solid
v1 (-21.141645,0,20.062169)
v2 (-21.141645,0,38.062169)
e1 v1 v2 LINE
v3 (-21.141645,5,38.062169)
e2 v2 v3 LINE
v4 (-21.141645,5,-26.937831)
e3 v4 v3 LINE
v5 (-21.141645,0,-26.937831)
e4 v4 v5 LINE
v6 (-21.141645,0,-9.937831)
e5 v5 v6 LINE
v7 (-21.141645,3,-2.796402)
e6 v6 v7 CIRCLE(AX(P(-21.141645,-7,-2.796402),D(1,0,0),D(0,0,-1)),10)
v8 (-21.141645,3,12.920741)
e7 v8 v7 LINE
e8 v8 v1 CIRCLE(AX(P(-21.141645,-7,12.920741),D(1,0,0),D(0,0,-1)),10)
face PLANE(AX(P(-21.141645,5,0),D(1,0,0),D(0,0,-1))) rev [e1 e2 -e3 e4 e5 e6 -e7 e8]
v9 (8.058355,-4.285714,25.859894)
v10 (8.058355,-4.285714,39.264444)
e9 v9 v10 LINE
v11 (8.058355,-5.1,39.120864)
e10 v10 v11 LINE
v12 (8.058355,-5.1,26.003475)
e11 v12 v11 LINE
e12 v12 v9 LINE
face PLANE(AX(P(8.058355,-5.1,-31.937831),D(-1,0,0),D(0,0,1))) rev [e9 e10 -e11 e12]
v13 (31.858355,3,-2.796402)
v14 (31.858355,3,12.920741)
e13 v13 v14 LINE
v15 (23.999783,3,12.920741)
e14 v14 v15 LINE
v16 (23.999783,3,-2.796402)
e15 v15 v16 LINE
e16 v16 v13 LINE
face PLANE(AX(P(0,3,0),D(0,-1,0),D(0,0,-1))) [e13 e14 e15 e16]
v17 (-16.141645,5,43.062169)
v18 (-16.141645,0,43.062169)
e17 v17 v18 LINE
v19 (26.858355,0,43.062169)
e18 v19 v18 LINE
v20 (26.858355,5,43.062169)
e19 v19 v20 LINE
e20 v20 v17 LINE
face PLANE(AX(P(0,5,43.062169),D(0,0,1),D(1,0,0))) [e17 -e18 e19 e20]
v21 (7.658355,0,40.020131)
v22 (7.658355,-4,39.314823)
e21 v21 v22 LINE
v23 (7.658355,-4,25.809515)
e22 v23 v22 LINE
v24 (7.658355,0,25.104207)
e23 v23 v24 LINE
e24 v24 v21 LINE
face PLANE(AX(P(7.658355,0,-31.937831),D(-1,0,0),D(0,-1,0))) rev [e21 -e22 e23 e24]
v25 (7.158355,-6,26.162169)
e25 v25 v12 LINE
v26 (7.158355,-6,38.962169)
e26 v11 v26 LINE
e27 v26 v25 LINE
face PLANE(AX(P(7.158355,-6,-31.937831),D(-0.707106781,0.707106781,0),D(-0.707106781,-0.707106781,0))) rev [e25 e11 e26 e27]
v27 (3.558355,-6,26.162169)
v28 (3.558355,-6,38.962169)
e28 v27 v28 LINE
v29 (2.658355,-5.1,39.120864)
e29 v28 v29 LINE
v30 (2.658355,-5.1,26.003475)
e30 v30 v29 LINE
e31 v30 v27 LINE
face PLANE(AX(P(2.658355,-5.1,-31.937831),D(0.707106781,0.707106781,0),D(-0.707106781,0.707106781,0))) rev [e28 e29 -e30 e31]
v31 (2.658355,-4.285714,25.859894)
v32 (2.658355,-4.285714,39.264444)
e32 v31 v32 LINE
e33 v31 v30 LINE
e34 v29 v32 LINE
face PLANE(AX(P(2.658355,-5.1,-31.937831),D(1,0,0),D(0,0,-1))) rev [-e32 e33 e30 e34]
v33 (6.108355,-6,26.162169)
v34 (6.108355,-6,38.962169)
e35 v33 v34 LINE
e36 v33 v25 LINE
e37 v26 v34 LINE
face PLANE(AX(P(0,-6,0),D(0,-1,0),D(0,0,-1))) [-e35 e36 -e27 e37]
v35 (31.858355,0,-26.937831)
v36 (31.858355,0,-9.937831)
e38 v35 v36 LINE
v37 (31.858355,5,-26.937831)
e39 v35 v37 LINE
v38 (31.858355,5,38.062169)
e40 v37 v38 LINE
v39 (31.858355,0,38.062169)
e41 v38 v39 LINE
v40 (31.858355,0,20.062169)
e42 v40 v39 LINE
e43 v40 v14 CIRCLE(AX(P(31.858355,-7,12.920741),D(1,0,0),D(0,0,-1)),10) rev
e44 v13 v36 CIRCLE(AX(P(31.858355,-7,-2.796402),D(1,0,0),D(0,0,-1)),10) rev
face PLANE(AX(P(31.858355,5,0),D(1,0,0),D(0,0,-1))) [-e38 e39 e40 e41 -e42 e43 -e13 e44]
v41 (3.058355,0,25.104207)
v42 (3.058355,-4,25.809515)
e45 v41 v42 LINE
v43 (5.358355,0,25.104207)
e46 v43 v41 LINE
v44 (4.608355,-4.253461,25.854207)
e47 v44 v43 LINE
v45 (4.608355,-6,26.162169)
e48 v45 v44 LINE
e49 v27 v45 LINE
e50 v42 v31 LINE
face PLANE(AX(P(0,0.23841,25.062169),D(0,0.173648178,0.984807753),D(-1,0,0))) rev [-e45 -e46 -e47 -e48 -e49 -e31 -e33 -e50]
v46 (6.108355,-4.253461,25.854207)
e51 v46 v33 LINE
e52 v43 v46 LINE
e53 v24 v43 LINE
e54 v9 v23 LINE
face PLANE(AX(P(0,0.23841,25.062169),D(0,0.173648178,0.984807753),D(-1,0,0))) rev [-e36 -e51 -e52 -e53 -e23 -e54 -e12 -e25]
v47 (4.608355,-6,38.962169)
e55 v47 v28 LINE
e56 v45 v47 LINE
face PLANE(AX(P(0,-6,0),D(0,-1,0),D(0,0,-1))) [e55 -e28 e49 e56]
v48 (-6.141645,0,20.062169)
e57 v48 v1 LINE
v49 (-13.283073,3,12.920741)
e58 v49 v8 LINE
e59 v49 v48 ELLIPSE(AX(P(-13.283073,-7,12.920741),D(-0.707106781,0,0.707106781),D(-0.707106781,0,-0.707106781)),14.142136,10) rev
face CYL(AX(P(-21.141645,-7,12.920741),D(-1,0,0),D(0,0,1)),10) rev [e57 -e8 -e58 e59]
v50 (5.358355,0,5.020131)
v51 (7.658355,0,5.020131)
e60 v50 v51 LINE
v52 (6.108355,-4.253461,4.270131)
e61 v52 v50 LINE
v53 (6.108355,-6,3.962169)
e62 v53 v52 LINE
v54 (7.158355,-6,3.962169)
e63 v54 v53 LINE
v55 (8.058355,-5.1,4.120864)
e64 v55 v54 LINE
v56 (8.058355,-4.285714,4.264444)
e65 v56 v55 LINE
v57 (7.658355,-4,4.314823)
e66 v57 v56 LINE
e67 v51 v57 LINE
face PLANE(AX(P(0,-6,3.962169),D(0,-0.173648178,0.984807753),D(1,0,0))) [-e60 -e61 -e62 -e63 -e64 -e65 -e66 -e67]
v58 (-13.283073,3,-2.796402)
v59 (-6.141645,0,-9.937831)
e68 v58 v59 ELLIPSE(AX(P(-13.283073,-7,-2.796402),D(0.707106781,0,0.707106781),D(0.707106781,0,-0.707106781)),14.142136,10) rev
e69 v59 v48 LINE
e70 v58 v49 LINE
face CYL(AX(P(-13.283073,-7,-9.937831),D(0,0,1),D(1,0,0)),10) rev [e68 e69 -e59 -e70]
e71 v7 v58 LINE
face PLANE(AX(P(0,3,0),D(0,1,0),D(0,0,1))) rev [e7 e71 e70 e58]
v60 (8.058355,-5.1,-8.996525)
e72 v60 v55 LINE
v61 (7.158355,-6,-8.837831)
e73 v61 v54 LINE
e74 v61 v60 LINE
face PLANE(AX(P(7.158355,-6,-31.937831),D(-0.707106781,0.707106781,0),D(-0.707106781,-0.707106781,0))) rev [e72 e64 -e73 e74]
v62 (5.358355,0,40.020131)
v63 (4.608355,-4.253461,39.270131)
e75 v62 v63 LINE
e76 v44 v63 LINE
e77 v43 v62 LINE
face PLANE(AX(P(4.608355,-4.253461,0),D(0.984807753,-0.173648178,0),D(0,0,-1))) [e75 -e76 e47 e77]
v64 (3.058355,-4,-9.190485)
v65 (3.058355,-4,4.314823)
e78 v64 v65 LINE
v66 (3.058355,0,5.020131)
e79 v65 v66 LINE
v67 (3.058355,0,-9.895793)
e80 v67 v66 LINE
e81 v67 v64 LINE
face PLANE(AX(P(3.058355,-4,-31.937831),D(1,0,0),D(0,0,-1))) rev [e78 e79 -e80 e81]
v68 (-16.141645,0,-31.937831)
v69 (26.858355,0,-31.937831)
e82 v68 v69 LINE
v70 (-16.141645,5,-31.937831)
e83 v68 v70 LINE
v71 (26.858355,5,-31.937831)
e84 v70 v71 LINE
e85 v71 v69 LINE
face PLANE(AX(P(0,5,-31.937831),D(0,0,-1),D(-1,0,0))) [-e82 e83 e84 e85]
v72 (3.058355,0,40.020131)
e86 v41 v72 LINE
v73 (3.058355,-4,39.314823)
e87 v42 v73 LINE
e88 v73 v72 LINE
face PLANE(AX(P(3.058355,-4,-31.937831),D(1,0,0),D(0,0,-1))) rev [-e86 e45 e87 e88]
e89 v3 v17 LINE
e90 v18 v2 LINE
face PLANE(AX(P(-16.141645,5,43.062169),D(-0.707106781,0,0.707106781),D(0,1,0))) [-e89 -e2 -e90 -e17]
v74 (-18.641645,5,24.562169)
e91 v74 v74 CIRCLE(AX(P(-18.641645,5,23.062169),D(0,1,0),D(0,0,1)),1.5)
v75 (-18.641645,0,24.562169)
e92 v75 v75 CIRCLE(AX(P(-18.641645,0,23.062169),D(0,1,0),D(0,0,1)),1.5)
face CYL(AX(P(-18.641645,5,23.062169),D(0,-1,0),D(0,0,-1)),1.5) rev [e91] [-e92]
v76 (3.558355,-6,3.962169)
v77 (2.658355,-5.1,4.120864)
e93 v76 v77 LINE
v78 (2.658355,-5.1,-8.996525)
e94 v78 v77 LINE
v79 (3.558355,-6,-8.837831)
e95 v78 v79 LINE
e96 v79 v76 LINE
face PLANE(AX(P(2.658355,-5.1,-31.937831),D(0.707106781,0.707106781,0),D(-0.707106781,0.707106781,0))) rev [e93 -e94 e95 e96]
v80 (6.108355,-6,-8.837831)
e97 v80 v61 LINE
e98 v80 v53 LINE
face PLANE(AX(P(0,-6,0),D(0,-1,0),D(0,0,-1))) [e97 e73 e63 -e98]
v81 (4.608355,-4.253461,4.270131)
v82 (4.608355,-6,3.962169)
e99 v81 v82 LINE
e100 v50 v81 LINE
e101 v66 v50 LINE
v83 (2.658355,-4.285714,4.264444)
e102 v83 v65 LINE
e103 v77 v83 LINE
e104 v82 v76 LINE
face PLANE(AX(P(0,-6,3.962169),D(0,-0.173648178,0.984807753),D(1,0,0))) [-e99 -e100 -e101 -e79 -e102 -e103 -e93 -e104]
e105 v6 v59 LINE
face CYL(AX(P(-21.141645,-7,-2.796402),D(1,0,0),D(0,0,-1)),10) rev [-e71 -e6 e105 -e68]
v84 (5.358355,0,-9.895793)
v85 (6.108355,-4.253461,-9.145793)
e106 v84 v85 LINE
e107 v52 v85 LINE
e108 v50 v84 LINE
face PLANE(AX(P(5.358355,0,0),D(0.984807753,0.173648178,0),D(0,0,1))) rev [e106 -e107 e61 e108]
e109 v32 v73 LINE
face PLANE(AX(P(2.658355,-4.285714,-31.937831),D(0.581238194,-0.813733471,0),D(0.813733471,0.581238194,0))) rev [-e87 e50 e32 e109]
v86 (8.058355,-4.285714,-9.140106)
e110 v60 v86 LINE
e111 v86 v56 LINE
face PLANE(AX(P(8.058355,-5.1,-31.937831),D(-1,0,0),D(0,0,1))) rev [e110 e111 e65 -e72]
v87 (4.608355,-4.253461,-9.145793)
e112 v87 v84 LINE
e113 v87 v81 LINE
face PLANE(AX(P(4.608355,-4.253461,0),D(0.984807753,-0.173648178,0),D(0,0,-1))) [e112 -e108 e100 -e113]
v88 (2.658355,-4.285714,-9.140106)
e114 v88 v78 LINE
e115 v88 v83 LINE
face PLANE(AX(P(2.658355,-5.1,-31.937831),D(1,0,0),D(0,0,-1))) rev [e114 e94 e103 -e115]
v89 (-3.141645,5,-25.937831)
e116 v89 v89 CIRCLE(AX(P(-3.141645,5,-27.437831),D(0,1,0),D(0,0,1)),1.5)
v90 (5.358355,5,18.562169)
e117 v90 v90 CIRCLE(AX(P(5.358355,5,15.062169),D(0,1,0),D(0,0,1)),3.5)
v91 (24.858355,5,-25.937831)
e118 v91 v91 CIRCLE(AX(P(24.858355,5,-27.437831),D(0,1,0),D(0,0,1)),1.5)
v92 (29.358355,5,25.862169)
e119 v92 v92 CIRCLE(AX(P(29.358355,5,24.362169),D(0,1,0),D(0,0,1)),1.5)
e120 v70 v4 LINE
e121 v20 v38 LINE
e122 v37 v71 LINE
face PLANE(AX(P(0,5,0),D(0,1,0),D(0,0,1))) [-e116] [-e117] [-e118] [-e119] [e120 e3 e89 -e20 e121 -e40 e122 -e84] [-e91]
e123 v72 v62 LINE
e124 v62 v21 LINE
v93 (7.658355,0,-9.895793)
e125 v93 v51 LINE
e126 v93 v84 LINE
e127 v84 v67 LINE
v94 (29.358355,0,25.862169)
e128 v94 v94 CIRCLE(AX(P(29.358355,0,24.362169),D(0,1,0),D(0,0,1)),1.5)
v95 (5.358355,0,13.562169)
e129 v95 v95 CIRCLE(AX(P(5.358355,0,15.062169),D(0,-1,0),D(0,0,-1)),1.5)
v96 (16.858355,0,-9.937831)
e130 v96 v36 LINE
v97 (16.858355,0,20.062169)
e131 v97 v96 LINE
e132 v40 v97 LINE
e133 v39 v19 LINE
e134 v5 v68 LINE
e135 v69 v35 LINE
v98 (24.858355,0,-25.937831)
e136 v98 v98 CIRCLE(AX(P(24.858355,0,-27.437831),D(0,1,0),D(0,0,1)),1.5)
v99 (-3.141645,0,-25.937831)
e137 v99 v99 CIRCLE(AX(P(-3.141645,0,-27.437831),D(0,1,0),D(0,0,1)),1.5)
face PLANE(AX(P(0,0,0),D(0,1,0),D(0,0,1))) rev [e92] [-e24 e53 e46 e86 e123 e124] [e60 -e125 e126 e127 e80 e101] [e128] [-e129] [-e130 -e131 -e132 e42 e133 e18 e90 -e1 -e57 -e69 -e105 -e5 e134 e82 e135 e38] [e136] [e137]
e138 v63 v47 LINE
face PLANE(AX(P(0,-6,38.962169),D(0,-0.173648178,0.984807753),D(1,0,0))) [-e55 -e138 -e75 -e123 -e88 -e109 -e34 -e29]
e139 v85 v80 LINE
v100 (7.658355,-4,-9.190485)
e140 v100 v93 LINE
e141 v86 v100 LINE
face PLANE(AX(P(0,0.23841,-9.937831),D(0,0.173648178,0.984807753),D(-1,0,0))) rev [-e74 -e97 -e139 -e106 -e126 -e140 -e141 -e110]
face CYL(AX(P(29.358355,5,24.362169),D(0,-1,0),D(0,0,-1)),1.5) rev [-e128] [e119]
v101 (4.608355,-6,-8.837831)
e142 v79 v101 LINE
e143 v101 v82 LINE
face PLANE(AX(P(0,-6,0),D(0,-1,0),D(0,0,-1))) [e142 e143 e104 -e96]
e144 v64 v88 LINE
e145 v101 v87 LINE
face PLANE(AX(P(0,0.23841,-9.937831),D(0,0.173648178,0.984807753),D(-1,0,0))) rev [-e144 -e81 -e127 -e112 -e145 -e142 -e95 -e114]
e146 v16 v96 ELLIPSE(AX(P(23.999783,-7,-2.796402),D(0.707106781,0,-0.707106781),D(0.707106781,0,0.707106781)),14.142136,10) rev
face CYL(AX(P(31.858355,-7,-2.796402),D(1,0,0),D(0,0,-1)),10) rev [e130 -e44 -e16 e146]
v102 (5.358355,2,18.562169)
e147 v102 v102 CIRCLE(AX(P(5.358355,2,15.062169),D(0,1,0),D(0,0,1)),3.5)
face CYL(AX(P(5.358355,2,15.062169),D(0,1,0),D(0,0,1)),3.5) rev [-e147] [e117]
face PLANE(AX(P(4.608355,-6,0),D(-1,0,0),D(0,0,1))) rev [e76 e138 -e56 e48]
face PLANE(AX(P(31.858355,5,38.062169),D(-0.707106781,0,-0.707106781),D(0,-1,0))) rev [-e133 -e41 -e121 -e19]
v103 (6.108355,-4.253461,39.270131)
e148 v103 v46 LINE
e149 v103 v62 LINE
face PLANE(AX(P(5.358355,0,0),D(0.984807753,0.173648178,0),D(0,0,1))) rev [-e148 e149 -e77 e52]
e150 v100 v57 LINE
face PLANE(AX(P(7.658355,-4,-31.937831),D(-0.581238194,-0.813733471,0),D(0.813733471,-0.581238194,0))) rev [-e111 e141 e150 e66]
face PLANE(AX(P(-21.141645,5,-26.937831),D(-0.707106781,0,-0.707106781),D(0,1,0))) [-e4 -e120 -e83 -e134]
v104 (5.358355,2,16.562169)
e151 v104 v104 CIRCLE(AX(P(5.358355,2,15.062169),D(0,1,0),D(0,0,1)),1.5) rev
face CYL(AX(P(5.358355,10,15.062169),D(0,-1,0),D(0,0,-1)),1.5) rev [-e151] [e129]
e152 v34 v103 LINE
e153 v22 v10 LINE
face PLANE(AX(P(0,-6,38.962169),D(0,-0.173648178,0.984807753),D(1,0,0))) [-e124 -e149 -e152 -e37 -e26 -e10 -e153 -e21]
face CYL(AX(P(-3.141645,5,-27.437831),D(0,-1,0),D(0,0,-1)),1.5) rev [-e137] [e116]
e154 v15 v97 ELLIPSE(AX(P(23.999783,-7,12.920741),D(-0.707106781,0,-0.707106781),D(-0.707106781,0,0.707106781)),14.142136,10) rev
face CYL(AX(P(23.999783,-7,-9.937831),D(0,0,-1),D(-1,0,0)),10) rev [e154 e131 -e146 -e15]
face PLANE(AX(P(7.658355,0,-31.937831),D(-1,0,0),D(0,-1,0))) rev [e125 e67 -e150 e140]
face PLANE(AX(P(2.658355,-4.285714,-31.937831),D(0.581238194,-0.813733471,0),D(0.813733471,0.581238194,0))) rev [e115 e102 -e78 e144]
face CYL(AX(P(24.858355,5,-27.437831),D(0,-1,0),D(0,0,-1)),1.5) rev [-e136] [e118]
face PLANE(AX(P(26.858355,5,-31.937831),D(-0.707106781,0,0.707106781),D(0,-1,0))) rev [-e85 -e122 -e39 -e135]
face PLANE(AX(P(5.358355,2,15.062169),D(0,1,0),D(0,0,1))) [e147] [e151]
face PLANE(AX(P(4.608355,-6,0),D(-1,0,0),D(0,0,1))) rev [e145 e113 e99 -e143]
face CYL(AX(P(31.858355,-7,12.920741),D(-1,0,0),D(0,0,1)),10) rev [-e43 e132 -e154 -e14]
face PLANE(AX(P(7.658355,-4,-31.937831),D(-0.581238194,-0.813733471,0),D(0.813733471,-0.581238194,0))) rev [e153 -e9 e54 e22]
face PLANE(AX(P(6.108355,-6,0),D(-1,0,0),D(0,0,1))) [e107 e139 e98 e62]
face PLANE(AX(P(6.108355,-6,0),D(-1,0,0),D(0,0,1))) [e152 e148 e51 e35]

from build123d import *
from OCP.BRepFilletAPI import BRepFilletAPI_MakeChamfer

# Parameters (mm, degrees)
SKETCH1_W           = 53
SKETCH1_H           = 5
SKETCH1_H_2         = 70
SKETCH1_R           = 1.5
BOSS_EXTRUDE1_DEPTH = 5
SKETCH2_R           = 1.5
CUT_EXTRUDE1_DEPTH  = 10
SKETCH3_R           = 3.5
CUT_EXTRUDE2_DEPTH  = 3
SKETCH2_3_W         = 2.25
SKETCH2_3_H         = 15
BOSS_EXTRUDE2_DEPTH = 6
CUT_EXTRUDE3_DEPTH  = 79.961729873
CHAMFER2_SIZE       = 0.75
CHAMFER2_SIZE_2     = 4.253461365
CHAMFER3_SIZE       = 1.1
CHAMFER3_SIZE_2     = 6.238410002
SKETCH5_W           = 15
SKETCH5_H           = 30
CUT_EXTRUDE4_DEPTH  = 3
FILLET1_R           = 10
CHAMFER4_SIZE       = 5


# Some blends are built 0.0001 mm under size
with BuildPart() as part:
    # Sketch1 → Boss-Extrude1 (new body)
    # profile 1 of 2: a face of its own
    with BuildSketch(Plane(origin=(0, 0, 0), x_dir=(1, 0, 0), z_dir=(0, 1, 0))):
        with Locations((5.35835502, -40.562169312)):
            Rectangle(SKETCH1_W, SKETCH1_H)
    # profile 2 of 2: a face of its own
    with BuildSketch(Plane(origin=(0, 0, 0), x_dir=(1, 0, 0), z_dir=(0, 1, 0))):
        with Locations((5.35835502, -3.062169312)):
            Rectangle(SKETCH1_W, SKETCH1_H_2)
        with Locations(Location((29.35835502, -24.362169312, 0), (0, 0, 270))):
            Circle(SKETCH1_R, mode=Mode.SUBTRACT)
        with Locations(Location((24.85835502, 27.437830688, 0), (0, 0, 270))):
            Circle(SKETCH1_R, mode=Mode.SUBTRACT)
        with Locations(Location((-3.14164498, 27.437830688, 0), (0, 0, 270))):
            Circle(SKETCH1_R, mode=Mode.SUBTRACT)
        with Locations(Location((-18.64164498, -23.062169312, 0), (0, 0, 270))):
            Circle(SKETCH1_R, mode=Mode.SUBTRACT)
    extrude(amount=BOSS_EXTRUDE1_DEPTH)

    # Sketch2 → Cut-Extrude1 (cut)
    with BuildSketch(Plane.XZ):
        with Locations(Location((5.35835502, 15.062169312, 0), (0, 0, 270))):
            Circle(SKETCH2_R)
    extrude(amount=-CUT_EXTRUDE1_DEPTH, mode=Mode.SUBTRACT)

    # Sketch3 → Cut-Extrude2 (cut)
    with BuildSketch(Plane(origin=(0, 5, 0), x_dir=(1, 0, 0), z_dir=(0, 1, 0))):
        with Locations(Location((5.35835502, -15.062169312, 0), (0, 0, 270))):
            Circle(SKETCH3_R)
    extrude(amount=-CUT_EXTRUDE2_DEPTH, mode=Mode.SUBTRACT)

    # Sketch2<3> → Boss-Extrude2 (add)
    with BuildSketch(Plane.XZ):
        with Locations((3.48335502, -2.437830688)):
            Rectangle(SKETCH2_3_W, SKETCH2_3_H)
        with Locations((7.23335502, -2.437830688)):
            Rectangle(SKETCH2_3_W, SKETCH2_3_H)
        with Locations((7.23335502, 32.562169312)):
            Rectangle(SKETCH2_3_W, SKETCH2_3_H)
        with Locations((3.48335502, 32.562169312)):
            Rectangle(SKETCH2_3_W, SKETCH2_3_H)
    extrude(amount=BOSS_EXTRUDE2_DEPTH)

    # Sketch4 → Cut-Extrude3 (cut, through all)
    with BuildSketch(Plane.XY.offset(40.062169312)):
        Polygon((8.35835502, -4.5), (8.35835502, 0), (7.65835502, 0), (7.65835502, -4), (8.05835502, -4.285714286), (8.05835502, -5.1), (7.15835502, -6), (8.35835502, -6), (8.35835502, -4.8), align=None)
        Polygon((2.65835502, -4.285714286), (3.05835502, -4), (3.05835502, 0), (2.35835502, 0), (2.35835502, -4.5), (2.35835502, -4.8), (2.35835502, -6), (3.55835502, -6), (2.65835502, -5.1), align=None)
    extrude(amount=-CUT_EXTRUDE3_DEPTH, mode=Mode.SUBTRACT)

    # Chamfer2
    chamfer2_edges_1 = [part.edges().sort_by_distance(p)[0] for p in [
        (4.60835502, 0, -2.437830688),
    ]]
    chamfer2_side_1 = [part.faces().sort_by_distance(p)[0] for p in [
        (4.62335502, 0, -2.437830688),
    ]]
    chamfer2_edges_2 = [part.edges().sort_by_distance(p)[0] for p in [
        (6.10835502, 0, -2.437830688),
    ]]
    chamfer2_side_2 = [part.faces().sort_by_distance(p)[0] for p in [
        (6.09335502, 0, -2.437830688),
    ]]
    chamfer2_edges_3 = [part.edges().sort_by_distance(p)[0] for p in [
        (6.10835502, 0, 32.562169312),
    ]]
    chamfer2_side_3 = [part.faces().sort_by_distance(p)[0] for p in [
        (6.09335502, 0, 32.562169312),
    ]]
    chamfer2_edges_4 = [part.edges().sort_by_distance(p)[0] for p in [
        (4.60835502, 0, 32.562169312),
    ]]
    chamfer2_side_4 = [part.faces().sort_by_distance(p)[0] for p in [
        (4.62335502, 0, 32.562169312),
    ]]
    chamfer2 = BRepFilletAPI_MakeChamfer(part.part.solid().wrapped)
    for e in chamfer2_edges_1:
        chamfer2.Add(CHAMFER2_SIZE - 0.0001, CHAMFER2_SIZE_2 - 0.0001, e.wrapped, chamfer2_side_1[0].wrapped)
    for e in chamfer2_edges_2:
        chamfer2.Add(CHAMFER2_SIZE - 0.0001, CHAMFER2_SIZE_2 - 0.0001, e.wrapped, chamfer2_side_2[0].wrapped)
    for e in chamfer2_edges_3:
        chamfer2.Add(CHAMFER2_SIZE - 0.0001, CHAMFER2_SIZE_2 - 0.0001, e.wrapped, chamfer2_side_3[0].wrapped)
    for e in chamfer2_edges_4:
        chamfer2.Add(CHAMFER2_SIZE - 0.0001, CHAMFER2_SIZE_2 - 0.0001, e.wrapped, chamfer2_side_4[0].wrapped)
    add(Compound.cast(chamfer2.Shape()), mode=Mode.REPLACE)  # a hair under: the kernel refuses the full size

    # Chamfer3
    # the kernel refuses this chamfer: 6.238410002, 1.1 mm, written as the material it takes off along each edge
    with BuildSketch(Plane(origin=(20.819105437, -6, 40.062169312), x_dir=(0, -0.210138760767435, -0.977671571246258), z_dir=(-1, 0, 0))) as chamfer3_piece_1_section:
        Polygon((CHAMFER3_SIZE * 0.977671571246, -CHAMFER3_SIZE * 0.210138760767), (-CHAMFER3_SIZE_2 * 0.210138760753, -CHAMFER3_SIZE_2 * 0.97767157118), (0, 0), align=None)
    chamfer3_piece_1 = extrude(amount=33.471500834, mode=Mode.PRIVATE)
    chamfer3_piece_1 = split(chamfer3_piece_1, bisect_by=Plane(origin=(4.08335502, 0, 39.758425896), z_dir=(0, -1, 0)), keep=Keep.TOP, mode=Mode.PRIVATE)
    add(chamfer3_piece_1, mode=Mode.SUBTRACT)
    with BuildSketch(Plane(origin=(-12.652395397, -6, 25.062169312), x_dir=(0, -0.210138760767435, 0.977671571246258), z_dir=(1, 0, 0))) as chamfer3_piece_2_section:
        Polygon((CHAMFER3_SIZE * 0.977671571246, -CHAMFER3_SIZE * 0.210138760767), (-CHAMFER3_SIZE_2 * 0.210138760753, -CHAMFER3_SIZE_2 * 0.97767157118), (0, 0), align=None)
    chamfer3_piece_2 = extrude(amount=33.471500834, mode=Mode.PRIVATE)
    chamfer3_piece_2 = split(chamfer3_piece_2, bisect_by=Plane(origin=(4.08335502, 0, 25.365912729), z_dir=(0, -1, 0)), keep=Keep.TOP, mode=Mode.PRIVATE)
    add(chamfer3_piece_2, mode=Mode.SUBTRACT)
    with BuildSketch(Plane(origin=(23.369105437, -6, 40.062169312), x_dir=(0, -0.210138760767435, -0.977671571246258), z_dir=(-1, 0, 0))) as chamfer3_piece_3_section:
        Polygon((CHAMFER3_SIZE * 0.977671571246, -CHAMFER3_SIZE * 0.210138760767), (-CHAMFER3_SIZE_2 * 0.210138760753, -CHAMFER3_SIZE_2 * 0.97767157118), (0, 0), align=None)
    chamfer3_piece_3 = extrude(amount=33.471500834, mode=Mode.PRIVATE)
    chamfer3_piece_3 = split(chamfer3_piece_3, bisect_by=Plane(origin=(6.63335502, 0, 39.758425896), z_dir=(0, -1, 0)), keep=Keep.TOP, mode=Mode.PRIVATE)
    add(chamfer3_piece_3, mode=Mode.SUBTRACT)
    with BuildSketch(Plane(origin=(-10.102395397, -6, 25.062169312), x_dir=(0, -0.210138760767435, 0.977671571246258), z_dir=(1, 0, 0))) as chamfer3_piece_4_section:
        Polygon((CHAMFER3_SIZE * 0.977671571246, -CHAMFER3_SIZE * 0.210138760767), (-CHAMFER3_SIZE_2 * 0.210138760753, -CHAMFER3_SIZE_2 * 0.97767157118), (0, 0), align=None)
    chamfer3_piece_4 = extrude(amount=33.471500834, mode=Mode.PRIVATE)
    chamfer3_piece_4 = split(chamfer3_piece_4, bisect_by=Plane(origin=(6.63335502, 0, 25.365912729), z_dir=(0, -1, 0)), keep=Keep.TOP, mode=Mode.PRIVATE)
    add(chamfer3_piece_4, mode=Mode.SUBTRACT)
    with BuildSketch(Plane(origin=(23.369105437, -6, 5.062169312), x_dir=(0, -0.21013876076743537, -0.9776715712462578), z_dir=(-1, 0, 0))) as chamfer3_piece_5_section:
        Polygon((CHAMFER3_SIZE * 0.977671571246, -CHAMFER3_SIZE * 0.210138760767), (-CHAMFER3_SIZE_2 * 0.210138760753, -CHAMFER3_SIZE_2 * 0.97767157118), (0, 0), align=None)
    chamfer3_piece_5 = extrude(amount=33.471500834, mode=Mode.PRIVATE)
    chamfer3_piece_5 = split(chamfer3_piece_5, bisect_by=Plane(origin=(6.63335502, 0, 4.758425896), z_dir=(0, -1, 0)), keep=Keep.TOP, mode=Mode.PRIVATE)
    add(chamfer3_piece_5, mode=Mode.SUBTRACT)
    with BuildSketch(Plane(origin=(-10.102395397, -6, -9.937830688), x_dir=(0, -0.21013876076743562, 0.9776715712462578), z_dir=(1, 0, 0))) as chamfer3_piece_6_section:
        Polygon((CHAMFER3_SIZE * 0.977671571246, -CHAMFER3_SIZE * 0.210138760767), (-CHAMFER3_SIZE_2 * 0.210138760753, -CHAMFER3_SIZE_2 * 0.97767157118), (0, 0), align=None)
    chamfer3_piece_6 = extrude(amount=33.471500834, mode=Mode.PRIVATE)
    chamfer3_piece_6 = split(chamfer3_piece_6, bisect_by=Plane(origin=(6.63335502, 0, -9.634087271), z_dir=(0, -1, 0)), keep=Keep.TOP, mode=Mode.PRIVATE)
    add(chamfer3_piece_6, mode=Mode.SUBTRACT)
    with BuildSketch(Plane(origin=(20.819105437, -6, 5.062169312), x_dir=(0, -0.21013876076743546, -0.9776715712462578), z_dir=(-1, 0, 0))) as chamfer3_piece_7_section:
        Polygon((CHAMFER3_SIZE * 0.977671571246, -CHAMFER3_SIZE * 0.210138760767), (-CHAMFER3_SIZE_2 * 0.210138760753, -CHAMFER3_SIZE_2 * 0.97767157118), (0, 0), align=None)
    chamfer3_piece_7 = extrude(amount=33.471500834, mode=Mode.PRIVATE)
    chamfer3_piece_7 = split(chamfer3_piece_7, bisect_by=Plane(origin=(4.08335502, 0, 4.758425896), z_dir=(0, -1, 0)), keep=Keep.TOP, mode=Mode.PRIVATE)
    add(chamfer3_piece_7, mode=Mode.SUBTRACT)
    with BuildSketch(Plane(origin=(-12.652395397, -6, -9.937830688), x_dir=(-1.5437276286848704e-15, -0.21013876076743562, 0.9776715712462578), z_dir=(1, 0, 0))) as chamfer3_piece_8_section:
        Polygon((CHAMFER3_SIZE * 0.977671571246, -CHAMFER3_SIZE * 0.210138760767), (-CHAMFER3_SIZE_2 * 0.210138760753, -CHAMFER3_SIZE_2 * 0.97767157118), (0, 0), align=None)
    chamfer3_piece_8 = extrude(amount=33.471500834, mode=Mode.PRIVATE)
    chamfer3_piece_8 = split(chamfer3_piece_8, bisect_by=Plane(origin=(4.08335502, 0, -9.634087271), z_dir=(0, -1, 0)), keep=Keep.TOP, mode=Mode.PRIVATE)
    add(chamfer3_piece_8, mode=Mode.SUBTRACT)

    # Sketch5 → Cut-Extrude4 (cut)
    with BuildSketch(Plane.XZ):
        with Locations((24.35835502, 5.062169312)):
            Rectangle(SKETCH5_W, SKETCH5_H)
        with Locations((-13.64164498, 5.062169312)):
            Rectangle(SKETCH5_W, SKETCH5_H)
    extrude(amount=-CUT_EXTRUDE4_DEPTH, mode=Mode.SUBTRACT)

    # Fillet1
    # the kernel refuses this fillet: 10 mm, written as the material it adds along each edge
    with BuildSketch(Plane(origin=(31.85835502, 3, -9.937830688), x_dir=(0, -1, 0), z_dir=(-1, 0, 0))) as fillet1_piece_1:
        with BuildLine():
            CenterArc((10, 7.141428429), FILLET1_R, 180, 45.572995999)
            Line((0, 7.141428429), (0, 0))
            Line((0, 0), (3, 0))
        make_face()
    extrude(amount=32.853571071)
    with BuildSketch(Plane(origin=(16.85835502, 3, 20.062169312), x_dir=(0, -1, 0), z_dir=(1, 0, 0))) as fillet1_piece_2:
        with BuildLine():
            CenterArc((10, 7.141428429), FILLET1_R, 180, 45.572995999)
            Line((0, 7.141428429), (0, 0))
            Line((0, 0), (3, 0))
        make_face()
    extrude(amount=15)
    with BuildSketch(Plane(origin=(-6.14164498, 3, 20.062169312), x_dir=(0, -1, 0), z_dir=(-1, 0, 0))) as fillet1_piece_3:
        with BuildLine():
            CenterArc((10, -7.141428429), FILLET1_R, 134.427004001, 45.572995999)
            Line((0, -7.141428429), (0, 0))
            Line((0, 0), (3, 0))
        make_face()
    extrude(amount=15)
    with BuildSketch(Plane(origin=(-21.14164498, 3, -9.937830688), x_dir=(0, -1, 0), z_dir=(1, 0, 0))) as fillet1_piece_4:
        with BuildLine():
            CenterArc((10, -7.141428429), FILLET1_R, 134.427004001, 45.572995999)
            Line((0, -7.141428429), (0, 0))
            Line((0, 0), (3, 0))
        make_face()
    extrude(amount=32.853571071)
    with BuildSketch(Plane(origin=(-6.14164498, 3, -27.791401759), x_dir=(0, -1, 0), z_dir=(0, 0, 1))) as fillet1_piece_5:
        with BuildLine():
            CenterArc((10, -7.141428429), FILLET1_R, 134.427004001, 45.572995999)
            Line((0, -7.141428429), (0, 0))
            Line((0, 0), (3, 0))
        make_face()
    extrude(amount=65.707142143)
    with BuildSketch(Plane(origin=(16.85835502, 3, -9.937830688), x_dir=(0, -1, 0), z_dir=(0, 0, 1))) as fillet1_piece_6:
        with BuildLine():
            CenterArc((10, 7.141428429), FILLET1_R, 180, 45.572995999)
            Line((0, 7.141428429), (0, 0))
            Line((0, 0), (3, 0))
        make_face()
    extrude(amount=47.853571071)

    # Chamfer4
    chamfer4_edges = [part.edges().sort_by_distance(p)[0] for p in [
        (31.85835502, 2.5, 43.062169312),
        (-21.14164498, 2.5, 43.062169312),
        (-21.14164498, 2.5, -31.937830688),
        (31.85835502, 2.5, -31.937830688),
    ]]
    chamfer(chamfer4_edges, length=CHAMFER4_SIZE)


solid = part.part
